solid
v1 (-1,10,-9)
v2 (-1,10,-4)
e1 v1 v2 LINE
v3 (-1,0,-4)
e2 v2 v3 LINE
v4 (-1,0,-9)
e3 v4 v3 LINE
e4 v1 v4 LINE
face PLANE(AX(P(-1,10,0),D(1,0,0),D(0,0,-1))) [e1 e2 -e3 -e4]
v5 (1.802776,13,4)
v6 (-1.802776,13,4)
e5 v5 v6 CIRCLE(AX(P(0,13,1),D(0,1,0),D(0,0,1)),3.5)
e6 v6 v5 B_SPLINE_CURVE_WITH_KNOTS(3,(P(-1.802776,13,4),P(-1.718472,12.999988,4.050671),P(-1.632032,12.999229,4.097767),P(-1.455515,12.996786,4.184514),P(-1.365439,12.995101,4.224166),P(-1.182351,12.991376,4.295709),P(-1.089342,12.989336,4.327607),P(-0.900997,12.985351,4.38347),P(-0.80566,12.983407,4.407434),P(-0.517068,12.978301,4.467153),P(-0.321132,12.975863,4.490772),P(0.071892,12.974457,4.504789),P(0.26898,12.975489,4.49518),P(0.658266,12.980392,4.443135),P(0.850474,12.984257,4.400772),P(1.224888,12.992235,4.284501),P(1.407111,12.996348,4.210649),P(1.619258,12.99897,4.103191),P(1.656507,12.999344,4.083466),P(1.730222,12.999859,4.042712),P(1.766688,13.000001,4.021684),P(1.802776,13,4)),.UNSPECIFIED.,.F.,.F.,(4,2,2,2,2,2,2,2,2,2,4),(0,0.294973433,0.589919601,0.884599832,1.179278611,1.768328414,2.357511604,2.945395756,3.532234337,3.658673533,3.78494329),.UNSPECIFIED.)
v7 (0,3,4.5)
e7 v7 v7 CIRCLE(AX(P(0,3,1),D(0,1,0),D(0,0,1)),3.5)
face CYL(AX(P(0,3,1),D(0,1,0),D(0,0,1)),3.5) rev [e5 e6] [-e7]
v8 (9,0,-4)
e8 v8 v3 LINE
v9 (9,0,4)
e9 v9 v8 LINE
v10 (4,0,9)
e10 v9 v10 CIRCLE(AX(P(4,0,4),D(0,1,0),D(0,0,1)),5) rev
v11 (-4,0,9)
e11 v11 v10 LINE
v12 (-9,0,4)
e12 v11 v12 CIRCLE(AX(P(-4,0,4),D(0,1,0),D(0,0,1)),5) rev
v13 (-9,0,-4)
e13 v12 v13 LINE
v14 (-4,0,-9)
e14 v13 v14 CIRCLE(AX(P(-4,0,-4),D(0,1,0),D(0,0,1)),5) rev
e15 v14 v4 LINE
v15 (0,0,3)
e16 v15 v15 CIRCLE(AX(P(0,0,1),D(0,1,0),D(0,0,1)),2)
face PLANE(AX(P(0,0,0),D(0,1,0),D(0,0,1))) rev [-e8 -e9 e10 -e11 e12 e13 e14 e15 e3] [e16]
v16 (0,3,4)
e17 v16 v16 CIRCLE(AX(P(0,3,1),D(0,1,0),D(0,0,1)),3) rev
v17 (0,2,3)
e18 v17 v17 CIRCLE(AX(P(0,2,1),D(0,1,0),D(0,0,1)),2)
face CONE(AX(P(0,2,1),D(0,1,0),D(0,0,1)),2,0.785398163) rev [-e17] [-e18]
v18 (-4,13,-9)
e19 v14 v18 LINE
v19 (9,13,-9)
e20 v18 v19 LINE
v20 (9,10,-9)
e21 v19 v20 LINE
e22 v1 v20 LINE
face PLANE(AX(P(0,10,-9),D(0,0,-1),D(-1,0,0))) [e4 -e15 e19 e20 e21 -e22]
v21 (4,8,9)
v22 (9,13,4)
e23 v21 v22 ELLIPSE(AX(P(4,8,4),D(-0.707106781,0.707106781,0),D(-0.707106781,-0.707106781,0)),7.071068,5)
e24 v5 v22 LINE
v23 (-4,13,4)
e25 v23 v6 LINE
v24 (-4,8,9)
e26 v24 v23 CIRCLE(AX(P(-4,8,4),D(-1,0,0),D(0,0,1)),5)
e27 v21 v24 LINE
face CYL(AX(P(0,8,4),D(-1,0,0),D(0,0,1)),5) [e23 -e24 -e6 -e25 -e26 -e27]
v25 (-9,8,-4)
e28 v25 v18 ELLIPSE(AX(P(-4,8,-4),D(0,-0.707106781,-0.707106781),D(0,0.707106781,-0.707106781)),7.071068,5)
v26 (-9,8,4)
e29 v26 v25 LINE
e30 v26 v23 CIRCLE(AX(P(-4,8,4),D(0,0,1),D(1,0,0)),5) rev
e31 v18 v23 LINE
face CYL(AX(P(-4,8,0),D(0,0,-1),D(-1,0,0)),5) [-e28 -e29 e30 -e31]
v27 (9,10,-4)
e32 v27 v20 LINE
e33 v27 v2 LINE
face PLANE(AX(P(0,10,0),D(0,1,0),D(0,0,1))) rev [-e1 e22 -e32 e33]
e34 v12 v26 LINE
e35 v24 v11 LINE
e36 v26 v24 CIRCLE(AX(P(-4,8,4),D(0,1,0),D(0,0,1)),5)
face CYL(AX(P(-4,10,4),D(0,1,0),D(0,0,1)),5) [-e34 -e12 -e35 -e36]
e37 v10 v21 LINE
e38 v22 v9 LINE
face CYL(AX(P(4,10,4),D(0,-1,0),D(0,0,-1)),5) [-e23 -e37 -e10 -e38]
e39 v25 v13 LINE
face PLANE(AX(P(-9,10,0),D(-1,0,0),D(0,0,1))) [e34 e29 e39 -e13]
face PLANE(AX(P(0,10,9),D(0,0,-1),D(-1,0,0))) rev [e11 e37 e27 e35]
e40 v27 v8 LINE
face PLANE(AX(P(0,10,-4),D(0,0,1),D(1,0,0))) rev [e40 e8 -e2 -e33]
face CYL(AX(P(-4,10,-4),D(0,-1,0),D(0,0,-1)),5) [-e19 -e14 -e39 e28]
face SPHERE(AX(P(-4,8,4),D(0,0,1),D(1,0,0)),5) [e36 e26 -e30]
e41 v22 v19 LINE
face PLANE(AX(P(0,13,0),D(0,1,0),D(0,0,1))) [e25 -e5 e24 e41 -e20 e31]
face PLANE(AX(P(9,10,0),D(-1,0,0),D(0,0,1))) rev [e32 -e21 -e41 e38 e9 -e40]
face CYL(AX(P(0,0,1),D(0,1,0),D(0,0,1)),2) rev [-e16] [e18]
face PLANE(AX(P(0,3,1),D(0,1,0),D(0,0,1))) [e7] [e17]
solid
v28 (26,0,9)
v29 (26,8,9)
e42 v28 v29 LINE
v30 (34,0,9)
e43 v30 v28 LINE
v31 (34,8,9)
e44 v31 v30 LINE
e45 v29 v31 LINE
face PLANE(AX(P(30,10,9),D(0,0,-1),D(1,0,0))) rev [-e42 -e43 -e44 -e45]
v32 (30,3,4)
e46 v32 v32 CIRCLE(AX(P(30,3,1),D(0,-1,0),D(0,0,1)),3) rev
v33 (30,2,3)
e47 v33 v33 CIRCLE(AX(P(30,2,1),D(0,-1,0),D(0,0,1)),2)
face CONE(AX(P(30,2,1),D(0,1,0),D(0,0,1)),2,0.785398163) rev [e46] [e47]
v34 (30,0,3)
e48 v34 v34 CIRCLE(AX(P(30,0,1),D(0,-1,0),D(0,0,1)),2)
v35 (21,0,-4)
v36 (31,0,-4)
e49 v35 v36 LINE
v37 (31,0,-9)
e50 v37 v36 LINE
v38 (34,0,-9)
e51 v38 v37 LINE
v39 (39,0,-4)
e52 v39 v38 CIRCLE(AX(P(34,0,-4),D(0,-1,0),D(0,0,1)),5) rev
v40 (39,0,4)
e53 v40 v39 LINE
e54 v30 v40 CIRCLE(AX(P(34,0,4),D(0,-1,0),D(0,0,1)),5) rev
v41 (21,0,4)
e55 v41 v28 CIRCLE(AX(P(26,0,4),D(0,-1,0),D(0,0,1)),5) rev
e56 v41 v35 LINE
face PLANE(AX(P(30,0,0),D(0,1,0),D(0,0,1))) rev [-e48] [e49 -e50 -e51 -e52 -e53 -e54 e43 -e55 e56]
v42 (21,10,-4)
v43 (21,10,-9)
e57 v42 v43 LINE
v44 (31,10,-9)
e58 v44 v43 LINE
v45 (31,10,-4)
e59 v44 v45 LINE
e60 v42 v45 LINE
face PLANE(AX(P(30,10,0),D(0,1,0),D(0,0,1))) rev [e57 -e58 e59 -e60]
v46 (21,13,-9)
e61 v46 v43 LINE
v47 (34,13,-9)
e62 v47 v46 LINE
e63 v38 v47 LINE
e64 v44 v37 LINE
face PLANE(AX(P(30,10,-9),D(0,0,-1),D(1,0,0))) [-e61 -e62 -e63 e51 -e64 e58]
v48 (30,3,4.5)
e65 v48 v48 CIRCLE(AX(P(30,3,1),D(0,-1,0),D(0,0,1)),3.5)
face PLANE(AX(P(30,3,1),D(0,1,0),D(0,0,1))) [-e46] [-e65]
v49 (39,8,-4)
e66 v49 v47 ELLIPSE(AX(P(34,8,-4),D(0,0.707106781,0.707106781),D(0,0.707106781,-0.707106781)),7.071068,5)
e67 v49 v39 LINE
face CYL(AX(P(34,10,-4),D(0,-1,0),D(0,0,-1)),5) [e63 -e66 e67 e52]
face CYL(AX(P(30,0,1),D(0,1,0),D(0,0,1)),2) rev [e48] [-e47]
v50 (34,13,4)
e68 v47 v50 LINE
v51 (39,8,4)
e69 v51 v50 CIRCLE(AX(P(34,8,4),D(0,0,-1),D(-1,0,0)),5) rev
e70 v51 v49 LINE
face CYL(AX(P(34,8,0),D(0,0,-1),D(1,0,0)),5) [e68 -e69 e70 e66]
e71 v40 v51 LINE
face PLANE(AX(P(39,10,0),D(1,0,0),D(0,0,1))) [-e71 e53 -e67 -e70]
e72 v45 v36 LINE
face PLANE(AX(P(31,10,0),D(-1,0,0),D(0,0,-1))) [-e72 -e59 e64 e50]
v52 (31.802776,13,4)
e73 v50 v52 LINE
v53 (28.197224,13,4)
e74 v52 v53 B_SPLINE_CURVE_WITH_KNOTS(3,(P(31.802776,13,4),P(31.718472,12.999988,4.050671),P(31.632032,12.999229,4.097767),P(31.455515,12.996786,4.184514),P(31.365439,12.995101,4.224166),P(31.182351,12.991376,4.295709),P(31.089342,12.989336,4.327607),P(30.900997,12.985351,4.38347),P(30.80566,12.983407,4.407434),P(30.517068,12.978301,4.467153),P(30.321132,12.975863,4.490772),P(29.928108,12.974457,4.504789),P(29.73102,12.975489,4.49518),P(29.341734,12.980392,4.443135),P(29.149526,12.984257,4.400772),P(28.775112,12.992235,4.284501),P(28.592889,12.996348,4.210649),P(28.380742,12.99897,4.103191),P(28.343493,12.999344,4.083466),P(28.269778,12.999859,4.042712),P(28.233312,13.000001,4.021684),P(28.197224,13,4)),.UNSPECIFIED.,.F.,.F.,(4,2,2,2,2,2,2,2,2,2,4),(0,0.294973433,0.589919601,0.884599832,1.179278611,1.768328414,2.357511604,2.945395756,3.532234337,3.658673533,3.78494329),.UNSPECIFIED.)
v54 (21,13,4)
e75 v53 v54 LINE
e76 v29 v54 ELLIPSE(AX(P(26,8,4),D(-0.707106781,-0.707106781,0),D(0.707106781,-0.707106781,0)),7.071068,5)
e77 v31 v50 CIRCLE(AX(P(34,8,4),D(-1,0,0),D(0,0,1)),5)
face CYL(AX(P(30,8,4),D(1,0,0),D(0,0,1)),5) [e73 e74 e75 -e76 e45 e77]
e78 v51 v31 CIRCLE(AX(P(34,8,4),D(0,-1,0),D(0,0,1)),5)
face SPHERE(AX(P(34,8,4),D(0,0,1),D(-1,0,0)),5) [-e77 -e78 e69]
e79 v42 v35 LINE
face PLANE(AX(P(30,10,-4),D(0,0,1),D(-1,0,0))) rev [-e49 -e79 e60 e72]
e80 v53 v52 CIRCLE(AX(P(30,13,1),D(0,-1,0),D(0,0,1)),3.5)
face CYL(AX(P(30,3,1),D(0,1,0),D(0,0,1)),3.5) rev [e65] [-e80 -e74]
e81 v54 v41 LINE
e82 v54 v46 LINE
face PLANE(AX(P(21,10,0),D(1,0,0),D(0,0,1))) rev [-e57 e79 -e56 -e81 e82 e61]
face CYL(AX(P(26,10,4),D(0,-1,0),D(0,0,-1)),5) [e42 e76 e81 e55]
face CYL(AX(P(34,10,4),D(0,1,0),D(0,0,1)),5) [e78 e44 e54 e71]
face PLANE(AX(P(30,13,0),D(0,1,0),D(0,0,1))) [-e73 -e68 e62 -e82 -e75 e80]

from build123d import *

# Parameters (mm, degrees)
BOSS_EXTRUDE1_DEPTH = 10
BOSS_EXTRUDE2_START = 10
SKETCH1_3_W         = 10
SKETCH1_3_H         = 5
BOSS_EXTRUDE2_DEPTH = 3
SKETCH2_R           = 3.5
SKETCH2_R_2         = 2
CUT_EXTRUDE1_DEPTH  = 10
SKETCH2_2_R         = 2
CUT_EXTRUDE2_DEPTH  = 19.193405399
CHAMFER1_SIZE       = 1
FILLET1_R           = 5


with BuildPart() as part:
    # Sketch1 → Boss-Extrude1 (new body)
    with BuildSketch(Plane(origin=(0, 0, 0), x_dir=(1, 0, 0), z_dir=(0, 1, 0))):
        Polygon((-9, 9), (-9, -9), (9, -9), (9, 4), (-1, 4), (-1, 9), align=None)
    extrude(amount=BOSS_EXTRUDE1_DEPTH)

    # Sketch1<3> → Boss-Extrude2 (add)
    with BuildSketch(Plane(origin=(0, 0, 0), x_dir=(1, 0, 0), z_dir=(0, 1, 0)).offset(BOSS_EXTRUDE2_START)):
        with Locations((4, 6.5)):
            Rectangle(SKETCH1_3_W, SKETCH1_3_H)
        Polygon((-9, 9), (-9, -9), (9, -9), (9, 4), (-1, 4), (-1, 9), align=None)
    extrude(amount=BOSS_EXTRUDE2_DEPTH)

    # Sketch2 → Cut-Extrude1 (cut)
    with BuildSketch(Plane(origin=(0, 13, 0), x_dir=(1, 0, 0), z_dir=(0, 1, 0))):
        with Locations(Location((0, -1, 0), (0, 0, 270))):
            Circle(SKETCH2_R)
        with Locations(Location((0, -1, 0), (0, 0, 270))):
            Circle(SKETCH2_R_2, mode=Mode.SUBTRACT)
    extrude(amount=-CUT_EXTRUDE1_DEPTH, mode=Mode.SUBTRACT)

    # Sketch2<2> → Cut-Extrude2 (cut, through all)
    with BuildSketch(Plane(origin=(0, 13, 0), x_dir=(1, 0, 0), z_dir=(0, 1, 0))):
        with Locations(Location((0, -1, 0), (0, 0, 270))):
            Circle(SKETCH2_2_R)
    extrude(amount=-CUT_EXTRUDE2_DEPTH, mode=Mode.SUBTRACT)

    # Chamfer1
    chamfer1_edges = [part.edges().sort_by_distance(p)[0] for p in [
        (0, 3, -1),
    ]]
    chamfer(chamfer1_edges, length=CHAMFER1_SIZE)

    # Fillet1
    # the kernel refuses this fillet: 5 mm, written as the material it takes off along each edge
    with BuildSketch(Plane(origin=(-4, 8, 4), x_dir=(0, 1, 0), z_dir=(0, 0, 1))) as fillet1_piece_1_section:
        Polygon((0, 0), (FILLET1_R, 0), (FILLET1_R, FILLET1_R), (0, FILLET1_R), align=None)
    fillet1_piece_1 = extrude(amount=FILLET1_R, mode=Mode.PRIVATE)
    fillet1_piece_1 = fillet1_piece_1 - Plane(origin=(-4, 8, 4), x_dir=(0.7071067811865475, -0.7071067811865475, 0), z_dir=(0, 0, 1)) * Sphere(FILLET1_R, mode=Mode.PRIVATE)
    add(fillet1_piece_1, mode=Mode.SUBTRACT)
    with BuildSketch(Plane(origin=(9, -12.5, 9), x_dir=(-1, 0, 0), z_dir=(0, 1, 0)), Plane(origin=(-9, -12.5, -9), x_dir=(1, 0, 0), z_dir=(0, 1, 0))) as fillet1_piece_2:
        with BuildLine():
            CenterArc((FILLET1_R, -FILLET1_R), FILLET1_R, 90, 90)
            Line((0, -FILLET1_R), (0, 0))
            Line((0, 0), (FILLET1_R, 0))
        make_face()
    extrude(amount=38, mode=Mode.SUBTRACT)
    with BuildSketch(Plane(origin=(-9, -12.5, 9), x_dir=(0, 0, -1), z_dir=(0, 1, 0))) as fillet1_piece_3:
        with BuildLine():
            CenterArc((FILLET1_R, -FILLET1_R), FILLET1_R, 90, 90)
            Line((0, -FILLET1_R), (0, 0))
            Line((0, 0), (FILLET1_R, 0))
        make_face()
    extrude(amount=20.5, mode=Mode.SUBTRACT)
    with BuildSketch(Plane(origin=(-9, 13, -21.5), x_dir=(0, -1, 0), z_dir=(0, 0, 1)), Plane(origin=(-4, 13, 9), x_dir=(0, -1, 0), z_dir=(1, 0, 0))) as fillet1_piece_4:
        with BuildLine():
            CenterArc((FILLET1_R, FILLET1_R), FILLET1_R, 180, 90)
            Line((0, FILLET1_R), (0, 0))
            Line((0, 0), (FILLET1_R, 0))
        make_face()
    extrude(amount=25.5, mode=Mode.SUBTRACT)


with BuildPart() as body_2:
    # Mirror2: mirrored copy
    add(part.part.mirror(Plane(origin=(15, 0, 0), x_dir=(0, 0, 1), z_dir=(1, 0, 0))))


solid = Compound([part.part, body_2.part])
